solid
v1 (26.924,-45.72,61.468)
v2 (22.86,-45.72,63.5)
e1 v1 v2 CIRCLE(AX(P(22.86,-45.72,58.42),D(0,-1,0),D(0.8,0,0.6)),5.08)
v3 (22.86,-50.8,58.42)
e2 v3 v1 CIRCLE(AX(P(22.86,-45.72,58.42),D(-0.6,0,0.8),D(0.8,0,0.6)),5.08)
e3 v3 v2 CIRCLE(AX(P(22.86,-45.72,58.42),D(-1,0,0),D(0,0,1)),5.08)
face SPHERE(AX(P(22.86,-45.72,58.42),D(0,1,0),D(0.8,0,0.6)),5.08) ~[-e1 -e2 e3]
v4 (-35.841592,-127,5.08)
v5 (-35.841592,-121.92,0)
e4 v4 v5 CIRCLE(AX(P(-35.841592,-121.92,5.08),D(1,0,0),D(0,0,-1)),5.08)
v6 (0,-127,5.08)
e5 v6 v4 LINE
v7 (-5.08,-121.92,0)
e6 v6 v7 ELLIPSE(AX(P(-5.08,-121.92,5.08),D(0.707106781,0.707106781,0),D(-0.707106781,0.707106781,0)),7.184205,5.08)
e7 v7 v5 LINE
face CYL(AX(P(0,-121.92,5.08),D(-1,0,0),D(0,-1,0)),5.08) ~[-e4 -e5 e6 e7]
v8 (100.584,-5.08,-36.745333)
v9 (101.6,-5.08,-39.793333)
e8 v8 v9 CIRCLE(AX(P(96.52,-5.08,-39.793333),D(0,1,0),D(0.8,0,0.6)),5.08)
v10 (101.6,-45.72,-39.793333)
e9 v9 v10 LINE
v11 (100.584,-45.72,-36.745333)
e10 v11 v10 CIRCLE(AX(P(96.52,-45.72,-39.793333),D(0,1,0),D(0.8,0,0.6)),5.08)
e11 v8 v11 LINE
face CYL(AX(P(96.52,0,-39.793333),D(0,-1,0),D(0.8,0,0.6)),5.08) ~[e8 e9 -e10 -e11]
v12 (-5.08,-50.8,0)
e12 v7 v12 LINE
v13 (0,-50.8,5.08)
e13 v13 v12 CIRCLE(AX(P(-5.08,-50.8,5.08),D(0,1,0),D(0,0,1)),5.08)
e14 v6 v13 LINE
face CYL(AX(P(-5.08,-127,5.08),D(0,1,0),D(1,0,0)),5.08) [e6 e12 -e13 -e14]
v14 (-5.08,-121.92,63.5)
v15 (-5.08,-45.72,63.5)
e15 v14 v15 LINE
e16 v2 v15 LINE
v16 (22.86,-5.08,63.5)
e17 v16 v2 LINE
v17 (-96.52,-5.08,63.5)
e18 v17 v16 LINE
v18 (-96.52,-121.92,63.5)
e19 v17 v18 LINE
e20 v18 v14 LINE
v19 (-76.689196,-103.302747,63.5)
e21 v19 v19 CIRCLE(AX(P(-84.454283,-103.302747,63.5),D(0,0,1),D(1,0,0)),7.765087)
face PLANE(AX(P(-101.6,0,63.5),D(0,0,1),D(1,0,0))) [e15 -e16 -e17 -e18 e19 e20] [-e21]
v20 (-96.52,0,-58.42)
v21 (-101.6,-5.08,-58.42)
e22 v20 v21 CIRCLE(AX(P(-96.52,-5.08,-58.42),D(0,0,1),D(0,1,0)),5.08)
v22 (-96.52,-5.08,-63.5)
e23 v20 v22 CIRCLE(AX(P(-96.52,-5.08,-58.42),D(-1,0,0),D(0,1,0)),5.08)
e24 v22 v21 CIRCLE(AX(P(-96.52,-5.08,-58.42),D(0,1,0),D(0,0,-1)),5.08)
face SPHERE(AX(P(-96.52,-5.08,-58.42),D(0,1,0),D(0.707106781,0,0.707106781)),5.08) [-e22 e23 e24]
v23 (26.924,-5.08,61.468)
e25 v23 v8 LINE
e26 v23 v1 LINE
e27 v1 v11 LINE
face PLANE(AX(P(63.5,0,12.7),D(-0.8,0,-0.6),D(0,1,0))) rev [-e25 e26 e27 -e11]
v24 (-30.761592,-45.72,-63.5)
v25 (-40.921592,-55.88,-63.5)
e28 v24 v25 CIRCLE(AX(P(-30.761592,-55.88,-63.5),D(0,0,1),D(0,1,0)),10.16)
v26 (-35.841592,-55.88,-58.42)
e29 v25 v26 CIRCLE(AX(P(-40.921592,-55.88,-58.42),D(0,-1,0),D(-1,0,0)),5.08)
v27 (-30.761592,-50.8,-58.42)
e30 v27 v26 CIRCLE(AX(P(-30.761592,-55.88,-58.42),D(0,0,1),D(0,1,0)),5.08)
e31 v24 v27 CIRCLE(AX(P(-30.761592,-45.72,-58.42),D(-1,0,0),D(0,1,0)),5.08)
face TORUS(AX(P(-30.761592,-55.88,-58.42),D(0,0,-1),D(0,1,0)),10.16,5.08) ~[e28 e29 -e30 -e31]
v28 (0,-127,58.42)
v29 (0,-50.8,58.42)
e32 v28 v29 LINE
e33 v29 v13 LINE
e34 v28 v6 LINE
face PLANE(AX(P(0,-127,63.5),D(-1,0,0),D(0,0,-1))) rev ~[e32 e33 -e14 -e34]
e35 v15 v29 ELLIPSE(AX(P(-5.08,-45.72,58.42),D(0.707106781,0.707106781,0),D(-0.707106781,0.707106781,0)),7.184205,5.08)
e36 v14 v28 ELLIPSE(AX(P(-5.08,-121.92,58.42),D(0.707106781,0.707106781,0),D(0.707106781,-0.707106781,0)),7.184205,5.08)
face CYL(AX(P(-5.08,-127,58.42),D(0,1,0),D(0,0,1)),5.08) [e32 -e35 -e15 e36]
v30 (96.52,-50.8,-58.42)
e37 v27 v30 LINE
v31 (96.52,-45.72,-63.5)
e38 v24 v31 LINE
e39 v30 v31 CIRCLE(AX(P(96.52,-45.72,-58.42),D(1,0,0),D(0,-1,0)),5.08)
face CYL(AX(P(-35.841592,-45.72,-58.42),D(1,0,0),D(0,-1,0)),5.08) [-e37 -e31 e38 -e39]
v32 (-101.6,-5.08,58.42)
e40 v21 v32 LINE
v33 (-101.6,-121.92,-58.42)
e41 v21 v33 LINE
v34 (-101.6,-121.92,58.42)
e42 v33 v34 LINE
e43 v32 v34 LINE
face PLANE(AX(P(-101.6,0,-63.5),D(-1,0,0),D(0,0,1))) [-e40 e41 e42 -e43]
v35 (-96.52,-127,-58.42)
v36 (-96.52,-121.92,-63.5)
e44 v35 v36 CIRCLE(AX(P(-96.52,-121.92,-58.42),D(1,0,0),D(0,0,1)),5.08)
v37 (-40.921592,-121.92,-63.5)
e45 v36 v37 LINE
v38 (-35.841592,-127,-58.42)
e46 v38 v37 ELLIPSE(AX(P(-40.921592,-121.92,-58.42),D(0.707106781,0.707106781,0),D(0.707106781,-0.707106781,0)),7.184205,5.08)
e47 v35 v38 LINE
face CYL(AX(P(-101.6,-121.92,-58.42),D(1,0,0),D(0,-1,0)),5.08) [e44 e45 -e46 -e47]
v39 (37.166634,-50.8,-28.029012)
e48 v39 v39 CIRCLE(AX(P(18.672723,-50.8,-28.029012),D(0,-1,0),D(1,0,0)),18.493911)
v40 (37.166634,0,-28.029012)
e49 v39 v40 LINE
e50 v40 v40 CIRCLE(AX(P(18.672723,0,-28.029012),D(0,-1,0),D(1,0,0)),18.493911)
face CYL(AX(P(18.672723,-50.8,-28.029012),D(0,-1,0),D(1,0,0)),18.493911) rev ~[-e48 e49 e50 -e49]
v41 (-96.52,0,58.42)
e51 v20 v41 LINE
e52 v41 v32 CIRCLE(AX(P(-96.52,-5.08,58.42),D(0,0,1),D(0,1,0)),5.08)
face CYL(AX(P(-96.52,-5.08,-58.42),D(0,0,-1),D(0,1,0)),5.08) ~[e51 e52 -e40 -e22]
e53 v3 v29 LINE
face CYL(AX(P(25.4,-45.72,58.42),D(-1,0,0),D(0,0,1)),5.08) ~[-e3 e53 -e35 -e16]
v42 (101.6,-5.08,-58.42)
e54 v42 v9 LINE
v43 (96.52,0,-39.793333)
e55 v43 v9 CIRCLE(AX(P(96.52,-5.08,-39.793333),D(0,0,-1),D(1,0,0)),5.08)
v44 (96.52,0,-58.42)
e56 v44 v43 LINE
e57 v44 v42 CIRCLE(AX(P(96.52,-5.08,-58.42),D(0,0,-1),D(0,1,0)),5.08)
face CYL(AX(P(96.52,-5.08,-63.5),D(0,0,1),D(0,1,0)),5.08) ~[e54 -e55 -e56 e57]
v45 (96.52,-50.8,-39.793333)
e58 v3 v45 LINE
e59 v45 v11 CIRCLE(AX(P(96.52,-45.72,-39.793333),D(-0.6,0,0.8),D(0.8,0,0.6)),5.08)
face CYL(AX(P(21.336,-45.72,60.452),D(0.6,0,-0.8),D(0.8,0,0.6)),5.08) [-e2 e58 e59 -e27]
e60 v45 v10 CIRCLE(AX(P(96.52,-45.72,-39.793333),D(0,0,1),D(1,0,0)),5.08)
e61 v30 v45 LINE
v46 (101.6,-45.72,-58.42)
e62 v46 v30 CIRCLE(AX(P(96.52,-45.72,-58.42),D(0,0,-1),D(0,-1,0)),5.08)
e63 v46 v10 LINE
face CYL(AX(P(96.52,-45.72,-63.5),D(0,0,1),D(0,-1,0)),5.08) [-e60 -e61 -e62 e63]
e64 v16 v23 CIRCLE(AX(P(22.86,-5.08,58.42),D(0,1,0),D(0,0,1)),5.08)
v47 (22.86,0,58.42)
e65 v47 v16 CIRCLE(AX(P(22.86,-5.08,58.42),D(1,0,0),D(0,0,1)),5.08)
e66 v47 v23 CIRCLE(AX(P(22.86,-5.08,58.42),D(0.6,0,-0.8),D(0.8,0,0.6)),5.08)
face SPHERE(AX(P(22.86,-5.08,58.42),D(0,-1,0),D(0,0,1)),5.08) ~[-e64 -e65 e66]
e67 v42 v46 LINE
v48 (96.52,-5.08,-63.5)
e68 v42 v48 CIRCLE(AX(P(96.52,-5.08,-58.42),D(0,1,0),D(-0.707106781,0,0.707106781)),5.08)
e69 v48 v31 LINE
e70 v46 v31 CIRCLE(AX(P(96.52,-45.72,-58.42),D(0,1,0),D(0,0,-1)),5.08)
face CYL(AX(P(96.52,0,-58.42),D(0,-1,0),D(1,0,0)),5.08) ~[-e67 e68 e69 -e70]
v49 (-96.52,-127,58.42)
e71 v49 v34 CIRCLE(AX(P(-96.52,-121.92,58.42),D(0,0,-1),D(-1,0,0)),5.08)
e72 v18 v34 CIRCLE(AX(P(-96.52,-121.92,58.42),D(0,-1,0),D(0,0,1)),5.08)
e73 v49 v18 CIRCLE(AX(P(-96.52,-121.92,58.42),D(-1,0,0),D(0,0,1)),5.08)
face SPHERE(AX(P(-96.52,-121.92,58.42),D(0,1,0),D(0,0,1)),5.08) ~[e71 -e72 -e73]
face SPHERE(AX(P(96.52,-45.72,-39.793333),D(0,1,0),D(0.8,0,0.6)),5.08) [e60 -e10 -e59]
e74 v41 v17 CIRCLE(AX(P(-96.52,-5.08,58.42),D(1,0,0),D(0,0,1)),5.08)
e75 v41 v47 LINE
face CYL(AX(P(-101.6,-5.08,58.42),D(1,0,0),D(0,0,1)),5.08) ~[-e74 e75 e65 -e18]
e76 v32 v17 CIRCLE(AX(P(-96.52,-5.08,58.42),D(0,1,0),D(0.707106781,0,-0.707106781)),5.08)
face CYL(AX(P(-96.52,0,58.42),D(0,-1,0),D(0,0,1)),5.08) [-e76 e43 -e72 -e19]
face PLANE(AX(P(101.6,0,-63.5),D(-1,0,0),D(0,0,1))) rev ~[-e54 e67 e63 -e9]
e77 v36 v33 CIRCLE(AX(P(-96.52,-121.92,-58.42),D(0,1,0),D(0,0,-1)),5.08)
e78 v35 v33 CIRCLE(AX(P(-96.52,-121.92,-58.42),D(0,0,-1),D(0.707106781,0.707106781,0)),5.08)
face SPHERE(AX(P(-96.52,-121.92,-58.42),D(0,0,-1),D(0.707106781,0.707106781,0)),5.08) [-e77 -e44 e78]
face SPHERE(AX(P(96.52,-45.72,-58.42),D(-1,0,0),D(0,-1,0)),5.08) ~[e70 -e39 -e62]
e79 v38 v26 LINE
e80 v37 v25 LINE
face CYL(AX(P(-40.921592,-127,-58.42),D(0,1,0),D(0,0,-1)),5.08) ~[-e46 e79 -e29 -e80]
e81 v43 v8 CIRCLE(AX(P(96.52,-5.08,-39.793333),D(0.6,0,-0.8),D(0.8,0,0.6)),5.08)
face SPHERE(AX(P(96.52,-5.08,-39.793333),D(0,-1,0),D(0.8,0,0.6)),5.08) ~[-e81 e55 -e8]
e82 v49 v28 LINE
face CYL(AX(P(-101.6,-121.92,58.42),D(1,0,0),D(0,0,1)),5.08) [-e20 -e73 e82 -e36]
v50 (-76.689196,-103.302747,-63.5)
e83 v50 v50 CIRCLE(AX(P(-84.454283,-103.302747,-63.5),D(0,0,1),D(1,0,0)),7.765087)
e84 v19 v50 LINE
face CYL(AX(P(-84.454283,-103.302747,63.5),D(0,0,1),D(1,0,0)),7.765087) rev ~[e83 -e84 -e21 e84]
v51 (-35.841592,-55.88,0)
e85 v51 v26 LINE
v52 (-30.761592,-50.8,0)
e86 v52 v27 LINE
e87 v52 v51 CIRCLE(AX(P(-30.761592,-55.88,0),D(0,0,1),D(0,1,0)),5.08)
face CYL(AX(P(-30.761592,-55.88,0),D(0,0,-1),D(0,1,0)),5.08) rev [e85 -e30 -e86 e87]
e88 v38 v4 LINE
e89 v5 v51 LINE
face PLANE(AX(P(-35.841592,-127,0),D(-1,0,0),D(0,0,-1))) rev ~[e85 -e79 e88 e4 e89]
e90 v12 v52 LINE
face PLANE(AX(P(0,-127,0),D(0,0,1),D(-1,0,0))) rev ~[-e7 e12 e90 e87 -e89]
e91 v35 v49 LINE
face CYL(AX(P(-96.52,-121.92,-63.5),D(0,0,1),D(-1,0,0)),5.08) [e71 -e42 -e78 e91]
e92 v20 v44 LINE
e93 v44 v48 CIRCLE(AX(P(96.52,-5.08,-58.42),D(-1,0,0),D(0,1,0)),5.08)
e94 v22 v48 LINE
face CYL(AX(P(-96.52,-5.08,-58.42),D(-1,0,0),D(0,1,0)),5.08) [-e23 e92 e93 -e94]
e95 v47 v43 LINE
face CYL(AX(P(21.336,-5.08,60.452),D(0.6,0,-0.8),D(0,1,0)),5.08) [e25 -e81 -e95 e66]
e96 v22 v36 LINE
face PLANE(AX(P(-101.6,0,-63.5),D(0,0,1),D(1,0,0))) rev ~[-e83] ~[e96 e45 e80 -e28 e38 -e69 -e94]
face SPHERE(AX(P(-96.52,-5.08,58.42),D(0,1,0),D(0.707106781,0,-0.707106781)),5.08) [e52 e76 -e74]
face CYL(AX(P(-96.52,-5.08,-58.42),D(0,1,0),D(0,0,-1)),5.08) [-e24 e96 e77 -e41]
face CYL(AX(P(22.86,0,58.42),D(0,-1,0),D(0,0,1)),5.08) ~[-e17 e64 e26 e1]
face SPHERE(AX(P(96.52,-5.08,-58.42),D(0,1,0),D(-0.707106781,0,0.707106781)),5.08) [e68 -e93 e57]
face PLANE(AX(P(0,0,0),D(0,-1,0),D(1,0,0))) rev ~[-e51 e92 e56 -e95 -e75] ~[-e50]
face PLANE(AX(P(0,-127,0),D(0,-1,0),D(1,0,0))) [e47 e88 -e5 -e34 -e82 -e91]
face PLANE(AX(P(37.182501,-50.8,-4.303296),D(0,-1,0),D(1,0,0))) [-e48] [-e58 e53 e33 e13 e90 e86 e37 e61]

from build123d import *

# Parameters (mm, degrees)
F0_W         = 203.2
F0_H         = 127
F1_DEPTH     = 127
F3_DEPTH     = 76.2
F4_SIZE2     = 101.6
F4_SIZE      = 76.2
F5_R         = 5.08
F6_T1_DEPTH  = 116.84
F6_T3_DEPTH  = 116.84
F6_T5_DEPTH  = 193.04
F6_S9_W      = 5.08
F6_S9_H      = 5.08
F6_T10_DEPTH = 5.08
F6_S15_W     = 5.08
F6_S15_H     = 5.08
F6_T16_DEPTH = 5.08
F6_S21_W     = 5.08
F6_S21_H     = 5.08
F6_T22_DEPTH = 5.08
F6_S27_W     = 5.08
F6_S27_H     = 5.08
F6_T28_DEPTH = 5.08
F7_R         = 18.4939106261
F8_DEPTH     = 50.8
F9_R         = 7.7650869993
F10_DEPTH    = 127


# Not quite as in the source:
# - a fillet or chamfer that OpenCascade refuses, or shapes differently, is made with other operations: its cross-section is extruded or revolved along the edge and cut away or added


with BuildPart() as f1:
    # F0 (on Front) → F1 (new body)
    with BuildSketch(Plane.XZ):
        Rectangle(F0_W, F0_H)
    extrude(amount=F1_DEPTH)

    # F2 (on face) → F3 (cut)
    with BuildSketch(Plane.XZ.offset(127)):
        Polygon((101.6, 63.5), (0, 63.5), (0, 0), (-35.8415916562, 0), (-35.8415916562, -63.5), (101.6, -63.5), align=None)
    extrude(amount=-F3_DEPTH, mode=Mode.SUBTRACT)

    # F4
    f4_edges = [f1.edges().sort_by_distance(p)[0] for p in [
        (101.6, -25.4, 63.5),
    ]]
    f4_side = f1.faces().sort_by_distance((-21.771429, -52.614286, 63.5))[0]
    chamfer(f4_edges, length=F4_SIZE, length2=F4_SIZE2, reference=f4_side)

    # F5
    f5_edges = [f1.edges().sort_by_distance(p)[0] for p in [
        (-101.6, -63.5, 63.5),
        (-50.8, -127, 63.5),
        (0, -88.9, 63.5),
        (12.7, -50.8, 63.5),
        (25.4, -25.4, 63.5),
        (-38.1, 0, 63.5),
        (-17.920796, -127, 0),
        (0, -88.9, 0),
        (-101.6, -127, 0),
        (-68.720796, -127, -63.5),
        (-35.841592, -88.9, -63.5),
        (-35.841592, -50.8, -31.75),
        (32.879204, -50.8, -63.5),
        (101.6, -50.8, -50.8),
        (101.6, -25.4, -63.5),
        (101.6, 0, -50.8),
        (101.6, -25.4, -38.1),
        (63.5, -50.8, 12.7),
        (63.5, 0, 12.7),
    ]]
    fillet(f5_edges, radius=F5_R)

    # F6: fillet of radius 5.08 on 3 edges, made by hand

    # F6_s2 → F6_t1 (cut)
    with BuildSketch(Plane.XZ.offset(5.08)):
        with BuildLine():
            ThreePointArc((-96.52, -63.5), (-100.1121024484, -62.0121024484), (-101.6, -58.42))
            Line((-101.6, -58.42), (-101.6, -63.5))
            Line((-101.6, -63.5), (-96.52, -63.5))
        make_face()
    extrude(amount=F6_T1_DEPTH, mode=Mode.SUBTRACT)

    # F6_s4 → F6_t3 (cut)
    with BuildSketch(Plane.XY.offset(-58.42)):
        with BuildLine():
            ThreePointArc((-96.52, 0), (-100.1121024484, -1.4878975516), (-101.6, -5.08))
            Line((-101.6, -5.08), (-101.6, 0))
            Line((-101.6, 0), (-96.52, 0))
        make_face()
    extrude(amount=F6_T3_DEPTH, mode=Mode.SUBTRACT)

    # F6_s6 → F6_t5 (cut)
    with BuildSketch(Plane.YZ.offset(-96.52)):
        with BuildLine():
            ThreePointArc((0, -58.42), (-1.4878975516, -62.0121024484), (-5.08, -63.5))
            Line((-5.08, -63.5), (0, -63.5))
            Line((0, -63.5), (0, -58.42))
        make_face()
    extrude(amount=F6_T5_DEPTH, mode=Mode.SUBTRACT)


with BuildPart() as f6_tool8:
    # F6_s9 → F6_t10 (new body)
    with BuildSketch(Plane.XZ.offset(5.08)):
        with Locations((99.06, -60.96)):
            Rectangle(F6_S9_W, F6_S9_H)
    extrude(amount=-F6_T10_DEPTH)

    # F6_s11 → F6_t12 (revolve, cut)
    with BuildSketch(Plane(origin=(96.52, -5.08, -58.42), x_dir=(-0.7071067812, 0, 0.7071067812), z_dir=(-0.7071067812, 0, -0.7071067812))):
        with BuildLine():
            ThreePointArc((0, -5.08), (5.08, 0), (0, 5.08))
            Line((0, 5.08), (0, -5.08))
        make_face()
    revolve(axis=Axis((96.52, -5.08, -58.42), (0, 1, 0)), mode=Mode.SUBTRACT)


with BuildPart() as f1_1:
    add(f1.part)

    # F6_t7: cut F6_tool8
    add(f6_tool8.part, mode=Mode.SUBTRACT)


with BuildPart() as f6_tool14:
    # F6_s15 → F6_t16 (new body)
    with BuildSketch(Plane.XZ.offset(5.08)):
        with Locations((-99.06, 60.96)):
            Rectangle(F6_S15_W, F6_S15_H)
    extrude(amount=-F6_T16_DEPTH)

    # F6_s17 → F6_t18 (revolve, cut)
    with BuildSketch(Plane(origin=(-96.52, -5.08, 58.42), x_dir=(0.7071067812, 0, -0.7071067812), z_dir=(0.7071067812, 0, 0.7071067812))):
        with BuildLine():
            ThreePointArc((0, -5.08), (5.08, 0), (0, 5.08))
            Line((0, 5.08), (0, -5.08))
        make_face()
    revolve(axis=Axis((-96.52, -5.08, 58.42), (0, 1, 0)), mode=Mode.SUBTRACT)


with BuildPart() as f1_2:
    add(f1_1.part)

    # F6_t13: cut F6_tool14
    add(f6_tool14.part, mode=Mode.SUBTRACT)


with BuildPart() as f6_tool20:
    # F6_s21 → F6_t22 (new body)
    with BuildSketch(Plane.XY.offset(-58.42)):
        with Locations((-99.06, -124.46)):
            Rectangle(F6_S21_W, F6_S21_H)
    extrude(amount=-F6_T22_DEPTH)

    # F6_s23 → F6_t24 (revolve, cut)
    with BuildSketch(Plane(origin=(-96.52, -121.92, -58.42), x_dir=(0.7071067812, 0.7071067812, 0), z_dir=(-0.7071067812, 0.7071067812, 0))):
        with BuildLine():
            ThreePointArc((0, -5.08), (5.08, 0), (0, 5.08))
            Line((0, 5.08), (0, -5.08))
        make_face()
    revolve(axis=Axis((-96.52, -121.92, -58.42), (0, 0, -1)), mode=Mode.SUBTRACT)


with BuildPart() as f1_3:
    add(f1_2.part)

    # F6_t19: cut F6_tool20
    add(f6_tool20.part, mode=Mode.SUBTRACT)


with BuildPart() as f6_tool26:
    # F6_s27 → F6_t28 (new body)
    with BuildSketch(Plane.XZ.offset(5.08)):
        with Locations((-99.06, -60.96)):
            Rectangle(F6_S27_W, F6_S27_H)
    extrude(amount=-F6_T28_DEPTH)

    # F6_s29 → F6_t30 (revolve, cut)
    with BuildSketch(Plane(origin=(-96.52, -5.08, -58.42), x_dir=(0.7071067812, 0, 0.7071067812), z_dir=(-0.7071067812, 0, 0.7071067812))):
        with BuildLine():
            ThreePointArc((0, -5.08), (5.08, 0), (0, 5.08))
            Line((0, 5.08), (0, -5.08))
        make_face()
    revolve(axis=Axis((-96.52, -5.08, -58.42), (0, 1, 0)), mode=Mode.SUBTRACT)


with BuildPart() as f1_4:
    add(f1_3.part)

    # F6_t25: cut F6_tool26
    add(f6_tool26.part, mode=Mode.SUBTRACT)

    # F7 (on face) → F8 (cut, through all)
    with BuildSketch(Plane.XZ.offset(50.8)):
        with Locations((18.6727233231, -28.0290115625)):
            Circle(F7_R)
    extrude(amount=-F8_DEPTH, mode=Mode.SUBTRACT)

    # F9 (on face) → F10 (cut, through all)
    with BuildSketch(Plane.XY.offset(63.5)):
        with Locations((-84.4542831182, -103.3027470112)):
            Circle(F9_R)
    extrude(amount=-F10_DEPTH, mode=Mode.SUBTRACT)


solid = f1_4.part
